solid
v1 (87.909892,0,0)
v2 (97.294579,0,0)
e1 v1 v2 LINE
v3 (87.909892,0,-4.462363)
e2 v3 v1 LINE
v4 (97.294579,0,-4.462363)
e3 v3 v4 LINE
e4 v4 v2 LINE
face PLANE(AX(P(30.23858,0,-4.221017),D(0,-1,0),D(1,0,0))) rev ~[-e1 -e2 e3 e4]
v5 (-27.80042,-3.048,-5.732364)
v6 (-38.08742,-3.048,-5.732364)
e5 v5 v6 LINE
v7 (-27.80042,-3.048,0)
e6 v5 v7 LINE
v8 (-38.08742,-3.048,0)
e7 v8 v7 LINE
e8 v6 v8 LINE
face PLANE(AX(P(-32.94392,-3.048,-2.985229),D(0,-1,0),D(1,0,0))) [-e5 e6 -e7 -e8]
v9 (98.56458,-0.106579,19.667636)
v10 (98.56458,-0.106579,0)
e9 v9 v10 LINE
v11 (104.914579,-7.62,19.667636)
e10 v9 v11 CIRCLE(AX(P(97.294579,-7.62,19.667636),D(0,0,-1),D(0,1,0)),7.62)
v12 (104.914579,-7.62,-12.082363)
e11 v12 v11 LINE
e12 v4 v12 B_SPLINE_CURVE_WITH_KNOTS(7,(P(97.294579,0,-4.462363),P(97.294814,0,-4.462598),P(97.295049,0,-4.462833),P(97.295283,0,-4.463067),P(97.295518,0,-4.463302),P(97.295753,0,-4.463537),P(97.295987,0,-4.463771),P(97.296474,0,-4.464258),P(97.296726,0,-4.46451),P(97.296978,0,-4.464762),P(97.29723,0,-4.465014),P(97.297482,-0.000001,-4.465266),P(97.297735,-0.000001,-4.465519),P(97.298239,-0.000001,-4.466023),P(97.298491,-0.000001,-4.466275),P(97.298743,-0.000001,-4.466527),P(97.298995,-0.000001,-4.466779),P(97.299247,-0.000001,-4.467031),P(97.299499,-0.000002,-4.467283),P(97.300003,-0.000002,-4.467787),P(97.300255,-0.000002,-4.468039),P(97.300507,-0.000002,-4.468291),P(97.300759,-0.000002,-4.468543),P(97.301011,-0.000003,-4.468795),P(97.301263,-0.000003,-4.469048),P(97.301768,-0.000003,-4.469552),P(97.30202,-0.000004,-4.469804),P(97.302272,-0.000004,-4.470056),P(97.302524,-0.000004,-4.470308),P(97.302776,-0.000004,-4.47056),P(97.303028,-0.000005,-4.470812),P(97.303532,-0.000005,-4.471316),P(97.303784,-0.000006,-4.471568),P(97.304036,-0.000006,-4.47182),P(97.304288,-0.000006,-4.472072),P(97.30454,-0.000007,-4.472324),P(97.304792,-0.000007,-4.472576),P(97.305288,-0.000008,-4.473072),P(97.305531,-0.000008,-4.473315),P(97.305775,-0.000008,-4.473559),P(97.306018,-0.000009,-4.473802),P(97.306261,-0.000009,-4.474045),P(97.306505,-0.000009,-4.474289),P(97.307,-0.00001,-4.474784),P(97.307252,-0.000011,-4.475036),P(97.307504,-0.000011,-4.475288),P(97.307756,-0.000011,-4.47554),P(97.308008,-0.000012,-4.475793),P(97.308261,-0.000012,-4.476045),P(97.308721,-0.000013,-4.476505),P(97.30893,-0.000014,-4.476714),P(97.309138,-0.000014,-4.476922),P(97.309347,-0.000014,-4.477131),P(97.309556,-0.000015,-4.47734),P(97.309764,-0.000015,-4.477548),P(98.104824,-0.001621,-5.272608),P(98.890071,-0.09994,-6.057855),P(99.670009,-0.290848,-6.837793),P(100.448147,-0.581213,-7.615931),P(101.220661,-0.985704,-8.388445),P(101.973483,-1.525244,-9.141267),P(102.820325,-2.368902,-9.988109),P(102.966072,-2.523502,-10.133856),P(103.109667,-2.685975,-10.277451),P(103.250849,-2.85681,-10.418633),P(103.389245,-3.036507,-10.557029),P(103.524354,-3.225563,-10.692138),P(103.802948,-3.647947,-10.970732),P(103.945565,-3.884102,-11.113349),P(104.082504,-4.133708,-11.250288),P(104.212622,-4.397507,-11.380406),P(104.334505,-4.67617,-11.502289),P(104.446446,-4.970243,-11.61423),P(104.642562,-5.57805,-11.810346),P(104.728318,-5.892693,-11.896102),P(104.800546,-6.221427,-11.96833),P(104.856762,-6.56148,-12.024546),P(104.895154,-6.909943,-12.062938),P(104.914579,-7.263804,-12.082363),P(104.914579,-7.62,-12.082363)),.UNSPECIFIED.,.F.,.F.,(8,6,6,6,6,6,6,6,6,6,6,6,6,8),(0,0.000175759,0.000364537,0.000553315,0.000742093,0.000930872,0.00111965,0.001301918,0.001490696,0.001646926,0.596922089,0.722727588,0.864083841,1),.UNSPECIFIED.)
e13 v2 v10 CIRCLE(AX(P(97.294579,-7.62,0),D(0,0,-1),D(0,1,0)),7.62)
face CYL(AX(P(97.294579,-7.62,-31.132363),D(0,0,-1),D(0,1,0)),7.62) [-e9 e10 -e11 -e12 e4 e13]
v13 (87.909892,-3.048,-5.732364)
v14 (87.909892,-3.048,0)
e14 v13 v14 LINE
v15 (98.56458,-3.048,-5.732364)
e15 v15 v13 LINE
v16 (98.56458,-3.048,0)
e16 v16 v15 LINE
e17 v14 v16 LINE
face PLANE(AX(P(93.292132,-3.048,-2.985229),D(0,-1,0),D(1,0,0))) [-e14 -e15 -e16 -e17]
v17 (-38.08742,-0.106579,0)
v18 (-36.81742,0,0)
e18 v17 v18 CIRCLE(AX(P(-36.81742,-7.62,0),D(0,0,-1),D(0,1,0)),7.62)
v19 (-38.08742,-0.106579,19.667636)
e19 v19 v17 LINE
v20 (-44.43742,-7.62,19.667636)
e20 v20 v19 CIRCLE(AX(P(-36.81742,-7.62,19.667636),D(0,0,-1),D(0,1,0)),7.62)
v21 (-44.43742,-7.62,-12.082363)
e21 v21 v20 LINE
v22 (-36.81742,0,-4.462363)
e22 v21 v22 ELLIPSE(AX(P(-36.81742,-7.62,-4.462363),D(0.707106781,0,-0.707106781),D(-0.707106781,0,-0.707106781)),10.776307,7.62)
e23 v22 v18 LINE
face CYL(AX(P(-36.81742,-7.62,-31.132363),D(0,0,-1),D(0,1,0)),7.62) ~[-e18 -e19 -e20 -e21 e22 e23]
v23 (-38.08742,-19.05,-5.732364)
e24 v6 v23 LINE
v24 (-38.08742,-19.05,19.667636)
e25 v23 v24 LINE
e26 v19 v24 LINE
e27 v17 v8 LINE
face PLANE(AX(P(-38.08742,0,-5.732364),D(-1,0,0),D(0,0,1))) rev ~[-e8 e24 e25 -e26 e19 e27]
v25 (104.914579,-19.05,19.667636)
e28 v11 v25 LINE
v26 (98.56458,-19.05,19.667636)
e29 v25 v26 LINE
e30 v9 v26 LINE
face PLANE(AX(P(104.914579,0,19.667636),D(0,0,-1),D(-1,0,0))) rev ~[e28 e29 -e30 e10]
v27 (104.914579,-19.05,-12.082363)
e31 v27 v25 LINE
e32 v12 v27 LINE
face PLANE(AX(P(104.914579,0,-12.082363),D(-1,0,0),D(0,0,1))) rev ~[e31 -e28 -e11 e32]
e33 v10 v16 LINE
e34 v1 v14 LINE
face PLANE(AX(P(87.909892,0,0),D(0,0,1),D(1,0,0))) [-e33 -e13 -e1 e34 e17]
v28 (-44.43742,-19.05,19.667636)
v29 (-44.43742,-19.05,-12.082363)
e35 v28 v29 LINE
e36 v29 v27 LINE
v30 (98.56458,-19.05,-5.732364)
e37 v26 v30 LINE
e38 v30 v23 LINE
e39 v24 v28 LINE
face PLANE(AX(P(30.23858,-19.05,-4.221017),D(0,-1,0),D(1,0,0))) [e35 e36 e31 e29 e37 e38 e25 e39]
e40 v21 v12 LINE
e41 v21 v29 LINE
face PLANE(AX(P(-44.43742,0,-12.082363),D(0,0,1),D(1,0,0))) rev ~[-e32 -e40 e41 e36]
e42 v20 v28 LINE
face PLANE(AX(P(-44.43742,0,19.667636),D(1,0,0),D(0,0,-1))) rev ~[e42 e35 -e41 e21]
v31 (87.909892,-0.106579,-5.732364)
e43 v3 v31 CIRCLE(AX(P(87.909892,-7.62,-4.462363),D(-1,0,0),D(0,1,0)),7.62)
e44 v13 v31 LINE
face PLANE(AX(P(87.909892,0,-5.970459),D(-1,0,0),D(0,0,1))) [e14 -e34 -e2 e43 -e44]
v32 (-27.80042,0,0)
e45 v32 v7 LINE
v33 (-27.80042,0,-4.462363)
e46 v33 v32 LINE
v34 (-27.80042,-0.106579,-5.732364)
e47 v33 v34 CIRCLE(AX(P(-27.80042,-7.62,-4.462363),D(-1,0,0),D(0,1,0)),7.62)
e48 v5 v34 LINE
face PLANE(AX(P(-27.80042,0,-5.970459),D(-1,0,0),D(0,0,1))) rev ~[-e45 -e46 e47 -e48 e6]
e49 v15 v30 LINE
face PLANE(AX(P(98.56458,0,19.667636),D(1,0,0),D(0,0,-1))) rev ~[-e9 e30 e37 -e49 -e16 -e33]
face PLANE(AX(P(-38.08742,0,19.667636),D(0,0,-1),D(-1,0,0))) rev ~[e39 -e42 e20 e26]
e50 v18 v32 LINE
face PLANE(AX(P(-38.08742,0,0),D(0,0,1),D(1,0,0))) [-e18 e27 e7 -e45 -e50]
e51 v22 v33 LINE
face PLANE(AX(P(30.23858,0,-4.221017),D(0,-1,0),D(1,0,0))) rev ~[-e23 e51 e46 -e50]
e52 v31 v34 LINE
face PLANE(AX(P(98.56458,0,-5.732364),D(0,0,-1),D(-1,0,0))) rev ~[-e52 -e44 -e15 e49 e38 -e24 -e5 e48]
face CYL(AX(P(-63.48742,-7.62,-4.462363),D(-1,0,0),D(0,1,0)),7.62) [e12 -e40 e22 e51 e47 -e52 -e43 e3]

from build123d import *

# Parameters (mm, degrees)
F1_DEPTH    = 19.05
F2_W        = 10.287
F2_H        = 5.9704589657
F2_W_2      = 10.7644796371
F3_DEPTH    = 3.048
F4_T1_DEPTH = 69.8499994576
F4_T3_DEPTH = 187.4519989152


# Not quite as in the source:
# - a fillet or chamfer that OpenCascade refuses, or shapes differently, is made with other operations: its cross-section is extruded or revolved along the edge and cut away or added


with BuildPart() as f1:
    # F0 (on Front) → F1 (new body)
    with BuildSketch(Plane.XZ):
        Polygon((-38.0874201655, -5.7323638652), (-38.0874201655, 19.6676361348), (-44.4374196231, 19.6676361348), (-44.4374196231, -12.0823633227), (104.9145792921, -12.0823633227), (104.9145792921, 19.6676361348), (98.5645798345, 19.6676361348), (98.5645798345, -5.7323638652), align=None)
    extrude(amount=F1_DEPTH)

    # F2 (on Front) → F3 (join)
    with BuildSketch(Plane.XZ):
        with Locations((-32.9439201655, -2.9852294829)):
            Rectangle(F2_W, F2_H)
        with Locations((93.29213202, -2.9852294829)):
            Rectangle(F2_W_2, F2_H)
    extrude(amount=F3_DEPTH)

    # F4: fillet of radius 7.62 on 3 edges, made by hand

    # F4_s2 → F4_t1 (cut)
    with BuildSketch(Plane.XY.offset(-31.1323633227)):
        with BuildLine():
            ThreePointArc((97.2945792921, 0), (102.6827329647, -2.2318463274), (104.9145792921, -7.62))
            Line((104.9145792921, -7.62), (104.9145792921, 0))
            Line((104.9145792921, 0), (97.2945792921, 0))
        make_face()
        with BuildLine():
            ThreePointArc((-36.8174196231, 0), (-42.2055732958, -2.2318463274), (-44.4374196231, -7.62))
            Line((-44.4374196231, -7.62), (-44.4374196231, 0))
            Line((-44.4374196231, 0), (-36.8174196231, 0))
        make_face()
    extrude(amount=F4_T1_DEPTH, mode=Mode.SUBTRACT)

    # F4_s4 → F4_t3 (cut)
    with BuildSketch(Plane.YZ.offset(-63.4874196231)):
        with BuildLine():
            ThreePointArc((0, -4.4623633227), (-2.2318463274, -9.8505169954), (-7.62, -12.0823633227))
            Line((-7.62, -12.0823633227), (0, -12.0823633227))
            Line((0, -12.0823633227), (0, -4.4623633227))
        make_face()
    extrude(amount=F4_T3_DEPTH, mode=Mode.SUBTRACT)


solid = f1.part
